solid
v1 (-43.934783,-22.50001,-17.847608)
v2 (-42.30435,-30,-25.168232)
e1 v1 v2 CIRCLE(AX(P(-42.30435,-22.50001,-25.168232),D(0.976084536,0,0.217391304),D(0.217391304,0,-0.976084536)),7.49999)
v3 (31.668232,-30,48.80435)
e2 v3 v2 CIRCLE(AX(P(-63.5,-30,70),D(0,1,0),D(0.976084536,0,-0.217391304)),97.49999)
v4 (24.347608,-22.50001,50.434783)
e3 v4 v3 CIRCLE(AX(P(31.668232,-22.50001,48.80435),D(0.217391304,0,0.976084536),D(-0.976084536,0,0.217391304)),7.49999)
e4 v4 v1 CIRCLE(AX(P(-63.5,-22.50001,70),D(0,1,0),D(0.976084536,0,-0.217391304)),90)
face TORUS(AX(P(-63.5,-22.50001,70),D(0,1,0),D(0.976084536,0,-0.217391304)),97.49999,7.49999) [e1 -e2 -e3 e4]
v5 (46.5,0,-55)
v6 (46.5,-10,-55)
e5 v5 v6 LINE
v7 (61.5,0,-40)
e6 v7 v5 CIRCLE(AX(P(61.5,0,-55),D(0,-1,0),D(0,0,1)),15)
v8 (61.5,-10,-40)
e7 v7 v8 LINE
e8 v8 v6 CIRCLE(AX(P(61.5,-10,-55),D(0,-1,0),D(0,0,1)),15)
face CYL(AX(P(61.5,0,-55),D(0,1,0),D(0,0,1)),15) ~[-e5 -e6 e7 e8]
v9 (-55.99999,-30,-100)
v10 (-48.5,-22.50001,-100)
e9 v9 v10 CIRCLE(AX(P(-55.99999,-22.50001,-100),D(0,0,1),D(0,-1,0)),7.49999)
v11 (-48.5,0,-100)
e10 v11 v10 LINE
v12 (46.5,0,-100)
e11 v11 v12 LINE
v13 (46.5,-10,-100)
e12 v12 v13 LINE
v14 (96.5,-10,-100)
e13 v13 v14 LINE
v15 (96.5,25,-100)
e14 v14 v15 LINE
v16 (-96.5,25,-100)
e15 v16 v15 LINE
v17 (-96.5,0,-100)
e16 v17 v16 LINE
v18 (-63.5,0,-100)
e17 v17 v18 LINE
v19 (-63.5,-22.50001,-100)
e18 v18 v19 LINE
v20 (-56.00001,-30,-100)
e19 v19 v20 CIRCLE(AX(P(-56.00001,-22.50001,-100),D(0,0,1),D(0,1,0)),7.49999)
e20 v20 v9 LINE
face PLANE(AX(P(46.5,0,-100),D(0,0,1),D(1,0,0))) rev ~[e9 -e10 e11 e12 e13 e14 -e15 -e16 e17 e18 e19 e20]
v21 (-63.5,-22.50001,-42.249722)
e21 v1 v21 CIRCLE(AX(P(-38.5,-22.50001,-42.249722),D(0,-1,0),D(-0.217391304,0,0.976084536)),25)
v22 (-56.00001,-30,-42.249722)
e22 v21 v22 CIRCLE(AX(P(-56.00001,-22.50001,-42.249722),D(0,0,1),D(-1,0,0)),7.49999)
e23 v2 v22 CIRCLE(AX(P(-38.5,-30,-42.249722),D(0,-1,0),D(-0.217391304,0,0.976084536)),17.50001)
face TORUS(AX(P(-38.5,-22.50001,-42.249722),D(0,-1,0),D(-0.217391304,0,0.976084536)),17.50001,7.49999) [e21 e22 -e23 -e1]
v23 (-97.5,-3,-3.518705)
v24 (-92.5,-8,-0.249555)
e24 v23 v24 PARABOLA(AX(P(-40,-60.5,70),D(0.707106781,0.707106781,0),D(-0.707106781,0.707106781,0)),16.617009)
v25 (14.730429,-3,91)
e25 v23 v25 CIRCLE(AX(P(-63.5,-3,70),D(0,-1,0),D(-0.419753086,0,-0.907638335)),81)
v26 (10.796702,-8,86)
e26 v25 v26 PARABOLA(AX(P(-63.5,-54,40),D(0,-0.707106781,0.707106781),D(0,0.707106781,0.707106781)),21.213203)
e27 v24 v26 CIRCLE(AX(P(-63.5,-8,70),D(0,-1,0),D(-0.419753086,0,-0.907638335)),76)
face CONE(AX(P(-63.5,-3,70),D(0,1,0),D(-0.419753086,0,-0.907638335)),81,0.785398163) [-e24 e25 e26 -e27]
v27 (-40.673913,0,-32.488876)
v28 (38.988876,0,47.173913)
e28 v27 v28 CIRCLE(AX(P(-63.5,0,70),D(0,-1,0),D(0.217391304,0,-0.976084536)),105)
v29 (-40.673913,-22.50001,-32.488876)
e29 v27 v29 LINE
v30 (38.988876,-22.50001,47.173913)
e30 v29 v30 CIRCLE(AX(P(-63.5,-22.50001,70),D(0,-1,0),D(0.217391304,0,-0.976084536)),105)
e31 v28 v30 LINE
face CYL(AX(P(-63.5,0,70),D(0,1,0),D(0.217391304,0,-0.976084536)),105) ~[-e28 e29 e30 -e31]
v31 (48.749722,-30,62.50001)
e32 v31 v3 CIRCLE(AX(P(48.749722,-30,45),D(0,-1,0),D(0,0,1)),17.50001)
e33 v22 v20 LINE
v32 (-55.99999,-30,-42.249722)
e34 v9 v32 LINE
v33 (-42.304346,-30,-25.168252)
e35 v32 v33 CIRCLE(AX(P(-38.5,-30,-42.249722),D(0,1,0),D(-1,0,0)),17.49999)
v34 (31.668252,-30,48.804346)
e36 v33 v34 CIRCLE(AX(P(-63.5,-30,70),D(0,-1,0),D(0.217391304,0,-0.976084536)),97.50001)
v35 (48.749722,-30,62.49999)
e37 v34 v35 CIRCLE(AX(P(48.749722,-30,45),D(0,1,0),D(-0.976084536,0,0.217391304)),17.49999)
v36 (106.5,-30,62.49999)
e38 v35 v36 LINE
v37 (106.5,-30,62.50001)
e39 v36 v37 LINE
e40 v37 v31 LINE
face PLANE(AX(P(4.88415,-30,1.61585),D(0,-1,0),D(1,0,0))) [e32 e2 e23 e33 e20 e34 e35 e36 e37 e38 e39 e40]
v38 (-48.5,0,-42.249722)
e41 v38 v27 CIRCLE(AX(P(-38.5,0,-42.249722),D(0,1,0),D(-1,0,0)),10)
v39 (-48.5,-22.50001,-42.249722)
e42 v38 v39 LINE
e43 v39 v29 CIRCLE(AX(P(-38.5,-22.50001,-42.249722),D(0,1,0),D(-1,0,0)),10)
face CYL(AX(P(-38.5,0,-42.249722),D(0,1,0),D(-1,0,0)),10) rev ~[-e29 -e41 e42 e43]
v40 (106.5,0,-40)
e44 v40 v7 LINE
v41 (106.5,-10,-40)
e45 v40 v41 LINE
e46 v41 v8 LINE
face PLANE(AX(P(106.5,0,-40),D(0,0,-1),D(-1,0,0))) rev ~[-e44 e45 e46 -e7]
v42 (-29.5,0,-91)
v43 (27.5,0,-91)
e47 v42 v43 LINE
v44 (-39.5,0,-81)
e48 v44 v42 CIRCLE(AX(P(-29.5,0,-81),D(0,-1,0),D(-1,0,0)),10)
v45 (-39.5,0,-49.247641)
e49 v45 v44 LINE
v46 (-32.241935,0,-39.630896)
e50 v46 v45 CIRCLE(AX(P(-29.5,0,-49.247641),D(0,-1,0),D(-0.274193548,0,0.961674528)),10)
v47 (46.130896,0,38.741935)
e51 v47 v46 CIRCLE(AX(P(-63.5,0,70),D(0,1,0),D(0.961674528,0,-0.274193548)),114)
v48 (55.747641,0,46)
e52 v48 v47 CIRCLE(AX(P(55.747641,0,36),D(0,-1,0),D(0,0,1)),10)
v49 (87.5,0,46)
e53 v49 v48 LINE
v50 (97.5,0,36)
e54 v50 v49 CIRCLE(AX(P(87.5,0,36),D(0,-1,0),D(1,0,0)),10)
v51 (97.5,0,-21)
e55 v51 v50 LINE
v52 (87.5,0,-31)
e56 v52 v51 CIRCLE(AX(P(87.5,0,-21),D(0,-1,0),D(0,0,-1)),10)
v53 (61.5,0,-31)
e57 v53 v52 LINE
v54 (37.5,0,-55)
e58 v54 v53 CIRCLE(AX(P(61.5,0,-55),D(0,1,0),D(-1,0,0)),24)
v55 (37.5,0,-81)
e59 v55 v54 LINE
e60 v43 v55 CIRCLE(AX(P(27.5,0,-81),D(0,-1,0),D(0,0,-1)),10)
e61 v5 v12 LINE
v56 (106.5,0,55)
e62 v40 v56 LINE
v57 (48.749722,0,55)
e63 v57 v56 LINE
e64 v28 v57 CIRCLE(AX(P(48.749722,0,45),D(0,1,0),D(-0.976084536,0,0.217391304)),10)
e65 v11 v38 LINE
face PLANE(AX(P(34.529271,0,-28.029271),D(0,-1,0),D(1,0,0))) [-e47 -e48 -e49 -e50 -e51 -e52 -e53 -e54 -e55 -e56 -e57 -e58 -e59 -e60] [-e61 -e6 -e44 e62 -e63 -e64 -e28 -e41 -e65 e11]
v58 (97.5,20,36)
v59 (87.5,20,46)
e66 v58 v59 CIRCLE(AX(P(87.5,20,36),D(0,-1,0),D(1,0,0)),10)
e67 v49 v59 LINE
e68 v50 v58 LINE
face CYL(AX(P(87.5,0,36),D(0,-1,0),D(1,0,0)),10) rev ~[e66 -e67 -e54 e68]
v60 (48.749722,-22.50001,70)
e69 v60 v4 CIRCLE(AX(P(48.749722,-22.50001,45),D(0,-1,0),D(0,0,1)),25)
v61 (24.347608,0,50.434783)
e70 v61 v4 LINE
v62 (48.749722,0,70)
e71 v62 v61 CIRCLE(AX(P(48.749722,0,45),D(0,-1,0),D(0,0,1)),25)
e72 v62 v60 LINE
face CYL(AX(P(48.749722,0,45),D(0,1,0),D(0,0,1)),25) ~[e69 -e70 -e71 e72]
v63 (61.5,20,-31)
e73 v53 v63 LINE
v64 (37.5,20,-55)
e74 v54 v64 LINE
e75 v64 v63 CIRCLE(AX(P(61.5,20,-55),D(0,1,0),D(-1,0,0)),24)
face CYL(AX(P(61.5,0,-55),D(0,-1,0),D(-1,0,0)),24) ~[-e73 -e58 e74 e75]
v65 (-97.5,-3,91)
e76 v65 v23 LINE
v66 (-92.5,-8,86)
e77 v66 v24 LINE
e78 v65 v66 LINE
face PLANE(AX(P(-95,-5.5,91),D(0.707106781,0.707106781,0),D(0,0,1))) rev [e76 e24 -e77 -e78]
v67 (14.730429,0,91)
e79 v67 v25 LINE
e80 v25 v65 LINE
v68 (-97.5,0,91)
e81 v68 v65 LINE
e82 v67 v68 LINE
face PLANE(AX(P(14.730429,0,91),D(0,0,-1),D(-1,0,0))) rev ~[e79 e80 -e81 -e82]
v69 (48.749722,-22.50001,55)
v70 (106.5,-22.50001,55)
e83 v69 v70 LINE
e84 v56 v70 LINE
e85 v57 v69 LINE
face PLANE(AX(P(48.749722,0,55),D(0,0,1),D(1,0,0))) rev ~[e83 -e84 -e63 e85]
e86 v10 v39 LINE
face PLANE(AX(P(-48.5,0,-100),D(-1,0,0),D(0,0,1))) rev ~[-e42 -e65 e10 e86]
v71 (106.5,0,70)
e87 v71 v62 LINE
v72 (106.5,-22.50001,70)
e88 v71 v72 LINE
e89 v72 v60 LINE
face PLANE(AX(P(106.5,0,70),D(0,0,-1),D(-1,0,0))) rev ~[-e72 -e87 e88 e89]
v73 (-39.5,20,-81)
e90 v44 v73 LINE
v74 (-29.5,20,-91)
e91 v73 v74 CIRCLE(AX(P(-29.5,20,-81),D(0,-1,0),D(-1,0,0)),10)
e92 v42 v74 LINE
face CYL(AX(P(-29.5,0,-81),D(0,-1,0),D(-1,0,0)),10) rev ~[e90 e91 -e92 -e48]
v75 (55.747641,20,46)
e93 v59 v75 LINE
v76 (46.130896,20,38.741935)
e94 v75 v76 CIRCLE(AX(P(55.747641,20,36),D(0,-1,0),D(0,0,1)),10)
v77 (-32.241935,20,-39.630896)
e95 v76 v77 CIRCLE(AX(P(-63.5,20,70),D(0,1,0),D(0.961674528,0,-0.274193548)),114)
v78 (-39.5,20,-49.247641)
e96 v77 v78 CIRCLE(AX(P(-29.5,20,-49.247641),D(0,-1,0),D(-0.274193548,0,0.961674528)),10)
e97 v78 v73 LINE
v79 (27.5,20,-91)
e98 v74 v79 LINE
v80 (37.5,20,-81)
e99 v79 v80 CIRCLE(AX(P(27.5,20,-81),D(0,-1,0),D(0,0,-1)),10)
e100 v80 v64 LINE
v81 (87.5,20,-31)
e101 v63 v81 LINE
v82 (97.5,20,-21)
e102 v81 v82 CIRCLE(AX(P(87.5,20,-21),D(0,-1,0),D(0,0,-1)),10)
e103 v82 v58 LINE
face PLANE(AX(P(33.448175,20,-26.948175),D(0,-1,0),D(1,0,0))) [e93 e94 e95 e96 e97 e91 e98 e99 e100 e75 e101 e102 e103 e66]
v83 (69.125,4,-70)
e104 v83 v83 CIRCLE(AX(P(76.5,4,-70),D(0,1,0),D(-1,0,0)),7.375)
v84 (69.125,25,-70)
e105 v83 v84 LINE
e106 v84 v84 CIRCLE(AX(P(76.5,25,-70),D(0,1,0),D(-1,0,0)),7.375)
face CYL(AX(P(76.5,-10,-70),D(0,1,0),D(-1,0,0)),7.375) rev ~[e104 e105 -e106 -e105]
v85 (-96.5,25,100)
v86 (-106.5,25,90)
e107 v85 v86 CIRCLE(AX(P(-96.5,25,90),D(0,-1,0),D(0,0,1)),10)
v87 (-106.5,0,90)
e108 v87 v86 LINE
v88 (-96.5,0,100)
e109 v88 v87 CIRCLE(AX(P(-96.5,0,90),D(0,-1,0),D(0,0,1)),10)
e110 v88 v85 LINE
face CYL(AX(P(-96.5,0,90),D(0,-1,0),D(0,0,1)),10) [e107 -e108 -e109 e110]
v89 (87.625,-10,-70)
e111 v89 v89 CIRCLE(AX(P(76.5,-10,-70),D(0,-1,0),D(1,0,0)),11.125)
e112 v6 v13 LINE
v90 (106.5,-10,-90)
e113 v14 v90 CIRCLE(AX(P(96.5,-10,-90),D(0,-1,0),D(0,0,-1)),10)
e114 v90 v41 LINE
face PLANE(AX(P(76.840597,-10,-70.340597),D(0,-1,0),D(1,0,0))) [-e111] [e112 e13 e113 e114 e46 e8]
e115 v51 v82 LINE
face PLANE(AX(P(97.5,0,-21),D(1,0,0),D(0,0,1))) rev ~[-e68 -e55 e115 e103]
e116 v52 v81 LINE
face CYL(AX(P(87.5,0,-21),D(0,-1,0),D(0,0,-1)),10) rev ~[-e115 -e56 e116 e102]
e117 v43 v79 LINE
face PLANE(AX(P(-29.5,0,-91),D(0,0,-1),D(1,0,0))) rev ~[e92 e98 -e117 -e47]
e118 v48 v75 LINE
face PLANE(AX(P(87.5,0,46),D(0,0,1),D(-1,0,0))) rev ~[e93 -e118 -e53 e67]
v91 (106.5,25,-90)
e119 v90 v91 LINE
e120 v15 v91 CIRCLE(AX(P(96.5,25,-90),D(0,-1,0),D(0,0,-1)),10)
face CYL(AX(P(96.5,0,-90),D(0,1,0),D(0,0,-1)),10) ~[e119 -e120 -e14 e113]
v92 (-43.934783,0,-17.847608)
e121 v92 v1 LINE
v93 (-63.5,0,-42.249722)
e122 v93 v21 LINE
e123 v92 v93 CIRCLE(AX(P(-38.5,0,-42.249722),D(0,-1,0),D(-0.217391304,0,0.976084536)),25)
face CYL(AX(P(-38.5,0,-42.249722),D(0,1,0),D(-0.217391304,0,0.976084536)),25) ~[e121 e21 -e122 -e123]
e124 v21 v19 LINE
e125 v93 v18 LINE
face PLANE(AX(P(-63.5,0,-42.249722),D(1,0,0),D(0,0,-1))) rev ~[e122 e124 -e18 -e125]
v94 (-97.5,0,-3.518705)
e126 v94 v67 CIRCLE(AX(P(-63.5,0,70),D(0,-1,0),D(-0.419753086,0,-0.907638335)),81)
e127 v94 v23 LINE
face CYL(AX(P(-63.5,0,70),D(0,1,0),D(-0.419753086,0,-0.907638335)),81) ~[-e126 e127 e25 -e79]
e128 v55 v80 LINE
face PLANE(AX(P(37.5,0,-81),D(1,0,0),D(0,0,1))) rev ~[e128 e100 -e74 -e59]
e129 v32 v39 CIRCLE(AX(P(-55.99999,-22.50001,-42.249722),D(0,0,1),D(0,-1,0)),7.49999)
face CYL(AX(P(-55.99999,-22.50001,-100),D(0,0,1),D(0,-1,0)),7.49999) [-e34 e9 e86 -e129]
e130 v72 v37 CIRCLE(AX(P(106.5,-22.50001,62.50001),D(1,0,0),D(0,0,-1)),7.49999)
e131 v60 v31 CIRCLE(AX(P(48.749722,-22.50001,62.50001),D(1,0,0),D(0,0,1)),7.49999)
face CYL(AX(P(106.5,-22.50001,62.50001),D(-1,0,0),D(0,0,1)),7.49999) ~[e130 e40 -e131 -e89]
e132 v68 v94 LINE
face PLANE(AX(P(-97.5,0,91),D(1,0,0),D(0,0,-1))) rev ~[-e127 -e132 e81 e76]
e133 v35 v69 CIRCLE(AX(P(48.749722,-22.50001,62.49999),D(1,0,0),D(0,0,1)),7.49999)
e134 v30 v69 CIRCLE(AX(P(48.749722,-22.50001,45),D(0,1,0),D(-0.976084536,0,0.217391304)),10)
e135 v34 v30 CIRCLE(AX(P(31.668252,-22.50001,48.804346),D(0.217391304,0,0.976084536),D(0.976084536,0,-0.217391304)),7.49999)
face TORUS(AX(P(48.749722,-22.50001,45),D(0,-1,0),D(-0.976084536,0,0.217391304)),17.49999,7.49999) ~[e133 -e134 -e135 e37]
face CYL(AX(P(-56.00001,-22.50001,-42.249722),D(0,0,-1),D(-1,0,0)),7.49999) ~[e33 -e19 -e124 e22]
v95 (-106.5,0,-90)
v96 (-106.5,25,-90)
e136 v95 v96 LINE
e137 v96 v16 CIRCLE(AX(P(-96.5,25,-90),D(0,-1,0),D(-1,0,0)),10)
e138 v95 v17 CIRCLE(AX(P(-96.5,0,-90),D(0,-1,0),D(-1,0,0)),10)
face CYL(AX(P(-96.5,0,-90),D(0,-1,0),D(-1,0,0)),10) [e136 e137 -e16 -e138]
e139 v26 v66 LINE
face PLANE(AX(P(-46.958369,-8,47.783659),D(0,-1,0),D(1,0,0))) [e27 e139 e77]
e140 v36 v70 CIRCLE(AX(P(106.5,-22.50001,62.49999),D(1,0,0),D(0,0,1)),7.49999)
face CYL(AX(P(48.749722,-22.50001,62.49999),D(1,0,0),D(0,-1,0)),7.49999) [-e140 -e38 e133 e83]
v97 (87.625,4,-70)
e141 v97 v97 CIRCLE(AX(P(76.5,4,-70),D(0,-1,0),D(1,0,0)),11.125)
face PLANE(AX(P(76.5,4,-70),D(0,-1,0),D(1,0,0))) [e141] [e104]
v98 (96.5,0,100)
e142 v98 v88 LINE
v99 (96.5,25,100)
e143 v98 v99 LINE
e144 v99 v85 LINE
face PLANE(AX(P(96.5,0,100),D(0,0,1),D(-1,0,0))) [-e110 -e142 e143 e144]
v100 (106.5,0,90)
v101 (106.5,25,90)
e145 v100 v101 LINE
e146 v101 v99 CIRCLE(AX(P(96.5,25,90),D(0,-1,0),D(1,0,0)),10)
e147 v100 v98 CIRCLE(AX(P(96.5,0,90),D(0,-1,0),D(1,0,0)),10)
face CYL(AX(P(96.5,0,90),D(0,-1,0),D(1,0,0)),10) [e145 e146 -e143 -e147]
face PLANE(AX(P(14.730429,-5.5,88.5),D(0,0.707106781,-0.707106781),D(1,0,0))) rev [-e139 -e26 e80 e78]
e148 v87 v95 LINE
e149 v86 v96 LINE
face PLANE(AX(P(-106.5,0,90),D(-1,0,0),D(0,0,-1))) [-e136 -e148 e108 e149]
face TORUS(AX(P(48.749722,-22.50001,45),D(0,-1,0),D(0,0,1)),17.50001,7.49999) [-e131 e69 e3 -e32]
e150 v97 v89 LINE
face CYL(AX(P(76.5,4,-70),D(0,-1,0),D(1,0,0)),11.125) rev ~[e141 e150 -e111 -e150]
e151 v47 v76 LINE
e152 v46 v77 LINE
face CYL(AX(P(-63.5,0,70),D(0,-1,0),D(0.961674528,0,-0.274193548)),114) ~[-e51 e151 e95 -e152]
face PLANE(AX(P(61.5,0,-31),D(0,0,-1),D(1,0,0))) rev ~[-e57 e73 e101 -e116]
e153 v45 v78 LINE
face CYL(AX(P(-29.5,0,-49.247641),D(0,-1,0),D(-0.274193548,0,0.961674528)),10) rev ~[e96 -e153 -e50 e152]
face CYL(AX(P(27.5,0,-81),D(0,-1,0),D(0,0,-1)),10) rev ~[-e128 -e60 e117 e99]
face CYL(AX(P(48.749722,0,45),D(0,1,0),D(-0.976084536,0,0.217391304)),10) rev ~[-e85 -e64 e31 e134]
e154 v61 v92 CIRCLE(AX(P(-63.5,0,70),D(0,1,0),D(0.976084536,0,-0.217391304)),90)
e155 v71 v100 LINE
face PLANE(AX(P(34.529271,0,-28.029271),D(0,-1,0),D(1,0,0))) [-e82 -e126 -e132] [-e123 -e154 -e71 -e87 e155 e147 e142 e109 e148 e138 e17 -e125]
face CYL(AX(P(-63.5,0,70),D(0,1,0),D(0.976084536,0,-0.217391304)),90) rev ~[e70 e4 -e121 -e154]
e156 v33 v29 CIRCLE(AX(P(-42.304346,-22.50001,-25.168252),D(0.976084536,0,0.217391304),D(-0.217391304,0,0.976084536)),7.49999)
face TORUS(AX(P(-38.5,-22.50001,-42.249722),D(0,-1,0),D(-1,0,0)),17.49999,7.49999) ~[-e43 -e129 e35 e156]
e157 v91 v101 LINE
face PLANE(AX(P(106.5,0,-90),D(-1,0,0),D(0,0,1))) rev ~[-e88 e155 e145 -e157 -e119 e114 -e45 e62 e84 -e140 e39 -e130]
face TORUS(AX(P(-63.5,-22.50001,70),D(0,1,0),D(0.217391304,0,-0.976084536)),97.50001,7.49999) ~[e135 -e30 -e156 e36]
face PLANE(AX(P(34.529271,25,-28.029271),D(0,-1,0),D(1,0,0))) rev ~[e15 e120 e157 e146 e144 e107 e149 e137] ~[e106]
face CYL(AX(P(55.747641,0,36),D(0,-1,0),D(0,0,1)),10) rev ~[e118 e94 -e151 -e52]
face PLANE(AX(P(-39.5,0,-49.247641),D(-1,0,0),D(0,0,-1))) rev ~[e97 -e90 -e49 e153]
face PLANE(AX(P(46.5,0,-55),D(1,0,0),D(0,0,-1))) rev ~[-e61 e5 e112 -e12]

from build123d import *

# Parameters (mm, degrees)
F1_DEPTH       = 25
F2_DEPTH       = 10
F3_DEPTH       = 30
F4_DEPTH       = 20
F5_DEPTH       = 8
F6_SIZE2       = 5
F6_SIZE        = 5
F8_D           = 14.75
F8_CBORE_D     = 22.25
F8_CBORE_DEPTH = 14
F9_R           = 7.49999


# Not quite as in the source:
# - a fillet or chamfer is up to 0.001 mm smaller than in the source, because OpenCascade refuses the exact size


with BuildPart() as f1:
    # F0 (on Front) → F1 (new body)
    with BuildSketch(Plane.XZ):
        with BuildLine():
            Line((106.5, -40), (106.5, 55))
            Line((106.5, 55), (48.7497216032, 55))
            ThreePointArc((48.7497216032, 55), (42.4942891815, 52.8018949761), (38.9888762464, 47.1739130435))
            ThreePointArc((38.9888762464, 47.1739130435), (10.7462120246, -4.2462120246), (-40.6739130435, -32.4888762464))
            ThreePointArc((-40.6739130435, -32.4888762464), (-46.3018949761, -35.9942891815), (-48.5, -42.2497216032))
            Line((-48.5, -42.2497216032), (-48.5, -100))
            Line((-48.5, -100), (46.5, -100))
            Line((46.5, -100), (46.5, -55))
            ThreePointArc((46.5, -55), (50.8933982822, -44.3933982822), (61.5, -40))
            Line((61.5, -40), (106.5, -40))
        make_face()
        with BuildLine():
            ThreePointArc((-29.5, -91), (-36.5710678119, -88.0710678119), (-39.5, -81))
            Line((-39.5, -81), (-39.5, -49.2476414861))
            ThreePointArc((-39.5, -49.2476414861), (-37.481834214, -43.2234965193), (-32.2419354839, -39.630896205))
            ThreePointArc((-32.2419354839, -39.630896205), (17.1101730553, -10.6101730553), (46.130896205, 38.7419354839))
            ThreePointArc((46.130896205, 38.7419354839), (49.7234965193, 43.981834214), (55.7476414861, 46))
            Line((55.7476414861, 46), (87.5, 46))
            ThreePointArc((87.5, 46), (94.5710678119, 43.0710678119), (97.5, 36))
            Line((97.5, 36), (97.5, -21))
            ThreePointArc((97.5, -21), (94.5710678119, -28.0710678119), (87.5, -31))
            Line((87.5, -31), (61.5, -31))
            ThreePointArc((61.5, -31), (44.5294372515, -38.0294372515), (37.5, -55))
            Line((37.5, -55), (37.5, -81))
            ThreePointArc((37.5, -81), (34.5710678119, -88.0710678119), (27.5, -91))
            Line((27.5, -91), (-29.5, -91))
        make_face(mode=Mode.SUBTRACT)
        with BuildLine():
            Line((96.5, 100), (-96.5, 100))
            ThreePointArc((-96.5, 100), (-103.5710678119, 97.0710678119), (-106.5, 90))
            Line((-106.5, 90), (-106.5, -90))
            ThreePointArc((-106.5, -90), (-103.5710678119, -97.0710678119), (-96.5, -100))
            Line((-96.5, -100), (-63.5, -100))
            Line((-63.5, -100), (-63.5, -42.2497216032))
            ThreePointArc((-63.5, -42.2497216032), (-58.0047374401, -26.6111405489), (-43.9347826087, -17.8476082112))
            ThreePointArc((-43.9347826087, -17.8476082112), (0.1396103068, 6.3603896932), (24.3476082112, 50.4347826087))
            ThreePointArc((24.3476082112, 50.4347826087), (33.1111405489, 64.5047374401), (48.7497216032, 70))
            Line((48.7497216032, 70), (106.5, 70))
            Line((106.5, 70), (106.5, 90))
            ThreePointArc((106.5, 90), (103.5710678119, 97.0710678119), (96.5, 100))
        make_face()
        with BuildLine():
            ThreePointArc((14.7304288624, 91), (-11.3221396288, 8.044605666), (-97.5, -3.5187051029))
            Line((-97.5, -3.5187051029), (-97.5, 91))
            Line((-97.5, 91), (14.7304288624, 91))
        make_face(mode=Mode.SUBTRACT)
        with BuildLine():
            Line((-97.5, 91), (-97.5, -3.5187051029))
            ThreePointArc((-97.5, -3.5187051029), (-11.3221396288, 8.044605666), (14.7304288624, 91))
            Line((14.7304288624, 91), (-97.5, 91))
        make_face()
        with BuildLine():
            Line((-39.5, -49.2476414861), (-39.5, -81))
            ThreePointArc((-39.5, -81), (-36.5710678119, -88.0710678119), (-29.5, -91))
            Line((-29.5, -91), (27.5, -91))
            ThreePointArc((27.5, -91), (34.5710678119, -88.0710678119), (37.5, -81))
            Line((37.5, -81), (37.5, -55))
            ThreePointArc((37.5, -55), (44.5294372515, -38.0294372515), (61.5, -31))
            Line((61.5, -31), (87.5, -31))
            ThreePointArc((87.5, -31), (94.5710678119, -28.0710678119), (97.5, -21))
            Line((97.5, -21), (97.5, 36))
            ThreePointArc((97.5, 36), (94.5710678119, 43.0710678119), (87.5, 46))
            Line((87.5, 46), (55.7476414861, 46))
            ThreePointArc((55.7476414861, 46), (49.7234965193, 43.981834214), (46.130896205, 38.7419354839))
            ThreePointArc((46.130896205, 38.7419354839), (17.1101730553, -10.6101730553), (-32.2419354839, -39.630896205))
            ThreePointArc((-32.2419354839, -39.630896205), (-37.481834214, -43.2234965193), (-39.5, -49.2476414861))
        make_face()
        with BuildLine():
            Line((106.5, 55), (106.5, 70))
            Line((106.5, 70), (48.7497216032, 70))
            ThreePointArc((48.7497216032, 70), (33.1111405489, 64.5047374401), (24.3476082112, 50.4347826087))
            ThreePointArc((24.3476082112, 50.4347826087), (0.1396103068, 6.3603896932), (-43.9347826087, -17.8476082112))
            ThreePointArc((-43.9347826087, -17.8476082112), (-58.0047374401, -26.6111405489), (-63.5, -42.2497216032))
            Line((-63.5, -42.2497216032), (-63.5, -100))
            Line((-63.5, -100), (-48.5, -100))
            Line((-48.5, -100), (-48.5, -42.2497216032))
            ThreePointArc((-48.5, -42.2497216032), (-46.3018949761, -35.9942891815), (-40.6739130435, -32.4888762464))
            ThreePointArc((-40.6739130435, -32.4888762464), (10.7462120246, -4.2462120246), (38.9888762464, 47.1739130435))
            ThreePointArc((38.9888762464, 47.1739130435), (42.4942891815, 52.8018949761), (48.7497216032, 55))
            Line((48.7497216032, 55), (106.5, 55))
        make_face()
        with BuildLine():
            Line((106.5, -90), (106.5, -40))
            Line((106.5, -40), (61.5, -40))
            ThreePointArc((61.5, -40), (50.8933982822, -44.3933982822), (46.5, -55))
            Line((46.5, -55), (46.5, -100))
            Line((46.5, -100), (96.5, -100))
            ThreePointArc((96.5, -100), (103.5710678119, -97.0710678119), (106.5, -90))
        make_face()
    extrude(amount=-F1_DEPTH)

    # F0 (on Front) → F2 (join)
    with BuildSketch(Plane.XZ):
        with BuildLine():
            Line((106.5, -90), (106.5, -40))
            Line((106.5, -40), (61.5, -40))
            ThreePointArc((61.5, -40), (50.8933982822, -44.3933982822), (46.5, -55))
            Line((46.5, -55), (46.5, -100))
            Line((46.5, -100), (96.5, -100))
            ThreePointArc((96.5, -100), (103.5710678119, -97.0710678119), (106.5, -90))
        make_face()
    extrude(amount=F2_DEPTH)

    # F0 (on Front) → F3 (join)
    with BuildSketch(Plane.XZ):
        with BuildLine():
            Line((106.5, 55), (106.5, 70))
            Line((106.5, 70), (48.7497216032, 70))
            ThreePointArc((48.7497216032, 70), (33.1111405489, 64.5047374401), (24.3476082112, 50.4347826087))
            ThreePointArc((24.3476082112, 50.4347826087), (0.1396103068, 6.3603896932), (-43.9347826087, -17.8476082112))
            ThreePointArc((-43.9347826087, -17.8476082112), (-58.0047374401, -26.6111405489), (-63.5, -42.2497216032))
            Line((-63.5, -42.2497216032), (-63.5, -100))
            Line((-63.5, -100), (-48.5, -100))
            Line((-48.5, -100), (-48.5, -42.2497216032))
            ThreePointArc((-48.5, -42.2497216032), (-46.3018949761, -35.9942891815), (-40.6739130435, -32.4888762464))
            ThreePointArc((-40.6739130435, -32.4888762464), (10.7462120246, -4.2462120246), (38.9888762464, 47.1739130435))
            ThreePointArc((38.9888762464, 47.1739130435), (42.4942891815, 52.8018949761), (48.7497216032, 55))
            Line((48.7497216032, 55), (106.5, 55))
        make_face()
    extrude(amount=F3_DEPTH)

    # F0 (on Front) → F4 (cut)
    with BuildSketch(Plane.XZ):
        with BuildLine():
            Line((-39.5, -49.2476414861), (-39.5, -81))
            ThreePointArc((-39.5, -81), (-36.5710678119, -88.0710678119), (-29.5, -91))
            Line((-29.5, -91), (27.5, -91))
            ThreePointArc((27.5, -91), (34.5710678119, -88.0710678119), (37.5, -81))
            Line((37.5, -81), (37.5, -55))
            ThreePointArc((37.5, -55), (44.5294372515, -38.0294372515), (61.5, -31))
            Line((61.5, -31), (87.5, -31))
            ThreePointArc((87.5, -31), (94.5710678119, -28.0710678119), (97.5, -21))
            Line((97.5, -21), (97.5, 36))
            ThreePointArc((97.5, 36), (94.5710678119, 43.0710678119), (87.5, 46))
            Line((87.5, 46), (55.7476414861, 46))
            ThreePointArc((55.7476414861, 46), (49.7234965193, 43.981834214), (46.130896205, 38.7419354839))
            ThreePointArc((46.130896205, 38.7419354839), (17.1101730553, -10.6101730553), (-32.2419354839, -39.630896205))
            ThreePointArc((-32.2419354839, -39.630896205), (-37.481834214, -43.2234965193), (-39.5, -49.2476414861))
        make_face()
    extrude(amount=-F4_DEPTH, mode=Mode.SUBTRACT)

    # F0 (on Front) → F5 (join)
    with BuildSketch(Plane.XZ):
        with BuildLine():
            Line((-97.5, 91), (-97.5, -3.5187051029))
            ThreePointArc((-97.5, -3.5187051029), (-11.3221396288, 8.044605666), (14.7304288624, 91))
            Line((14.7304288624, 91), (-97.5, 91))
        make_face()
    extrude(amount=F5_DEPTH)

    # F6
    f6_edges = [f1.edges().sort_by_distance(p)[0] for p in [
        (-41.384786, -8, 91),
        (-97.5, -8, 43.740647),
        (-11.32214, -8, 8.044606),
    ]]
    chamfer(f6_edges, length=F6_SIZE, length2=F6_SIZE2)

    # F8 (through all)
    with Locations(Plane.XZ.offset(10)):
        with Locations((76.5, -70)):
            CounterBoreHole(F8_D / 2, F8_CBORE_D / 2, F8_CBORE_DEPTH)

    # F9 (radius 7.5 in the source; OpenCascade refuses exactly that, so slightly less here)
    f9_edges = [f1.edges().sort_by_distance(p)[0] for p in [
        (-48.5, -30, -71.124861),
        (-63.5, -30, -71.124861),
    ]]
    fillet(f9_edges, radius=F9_R)


solid = f1.part
